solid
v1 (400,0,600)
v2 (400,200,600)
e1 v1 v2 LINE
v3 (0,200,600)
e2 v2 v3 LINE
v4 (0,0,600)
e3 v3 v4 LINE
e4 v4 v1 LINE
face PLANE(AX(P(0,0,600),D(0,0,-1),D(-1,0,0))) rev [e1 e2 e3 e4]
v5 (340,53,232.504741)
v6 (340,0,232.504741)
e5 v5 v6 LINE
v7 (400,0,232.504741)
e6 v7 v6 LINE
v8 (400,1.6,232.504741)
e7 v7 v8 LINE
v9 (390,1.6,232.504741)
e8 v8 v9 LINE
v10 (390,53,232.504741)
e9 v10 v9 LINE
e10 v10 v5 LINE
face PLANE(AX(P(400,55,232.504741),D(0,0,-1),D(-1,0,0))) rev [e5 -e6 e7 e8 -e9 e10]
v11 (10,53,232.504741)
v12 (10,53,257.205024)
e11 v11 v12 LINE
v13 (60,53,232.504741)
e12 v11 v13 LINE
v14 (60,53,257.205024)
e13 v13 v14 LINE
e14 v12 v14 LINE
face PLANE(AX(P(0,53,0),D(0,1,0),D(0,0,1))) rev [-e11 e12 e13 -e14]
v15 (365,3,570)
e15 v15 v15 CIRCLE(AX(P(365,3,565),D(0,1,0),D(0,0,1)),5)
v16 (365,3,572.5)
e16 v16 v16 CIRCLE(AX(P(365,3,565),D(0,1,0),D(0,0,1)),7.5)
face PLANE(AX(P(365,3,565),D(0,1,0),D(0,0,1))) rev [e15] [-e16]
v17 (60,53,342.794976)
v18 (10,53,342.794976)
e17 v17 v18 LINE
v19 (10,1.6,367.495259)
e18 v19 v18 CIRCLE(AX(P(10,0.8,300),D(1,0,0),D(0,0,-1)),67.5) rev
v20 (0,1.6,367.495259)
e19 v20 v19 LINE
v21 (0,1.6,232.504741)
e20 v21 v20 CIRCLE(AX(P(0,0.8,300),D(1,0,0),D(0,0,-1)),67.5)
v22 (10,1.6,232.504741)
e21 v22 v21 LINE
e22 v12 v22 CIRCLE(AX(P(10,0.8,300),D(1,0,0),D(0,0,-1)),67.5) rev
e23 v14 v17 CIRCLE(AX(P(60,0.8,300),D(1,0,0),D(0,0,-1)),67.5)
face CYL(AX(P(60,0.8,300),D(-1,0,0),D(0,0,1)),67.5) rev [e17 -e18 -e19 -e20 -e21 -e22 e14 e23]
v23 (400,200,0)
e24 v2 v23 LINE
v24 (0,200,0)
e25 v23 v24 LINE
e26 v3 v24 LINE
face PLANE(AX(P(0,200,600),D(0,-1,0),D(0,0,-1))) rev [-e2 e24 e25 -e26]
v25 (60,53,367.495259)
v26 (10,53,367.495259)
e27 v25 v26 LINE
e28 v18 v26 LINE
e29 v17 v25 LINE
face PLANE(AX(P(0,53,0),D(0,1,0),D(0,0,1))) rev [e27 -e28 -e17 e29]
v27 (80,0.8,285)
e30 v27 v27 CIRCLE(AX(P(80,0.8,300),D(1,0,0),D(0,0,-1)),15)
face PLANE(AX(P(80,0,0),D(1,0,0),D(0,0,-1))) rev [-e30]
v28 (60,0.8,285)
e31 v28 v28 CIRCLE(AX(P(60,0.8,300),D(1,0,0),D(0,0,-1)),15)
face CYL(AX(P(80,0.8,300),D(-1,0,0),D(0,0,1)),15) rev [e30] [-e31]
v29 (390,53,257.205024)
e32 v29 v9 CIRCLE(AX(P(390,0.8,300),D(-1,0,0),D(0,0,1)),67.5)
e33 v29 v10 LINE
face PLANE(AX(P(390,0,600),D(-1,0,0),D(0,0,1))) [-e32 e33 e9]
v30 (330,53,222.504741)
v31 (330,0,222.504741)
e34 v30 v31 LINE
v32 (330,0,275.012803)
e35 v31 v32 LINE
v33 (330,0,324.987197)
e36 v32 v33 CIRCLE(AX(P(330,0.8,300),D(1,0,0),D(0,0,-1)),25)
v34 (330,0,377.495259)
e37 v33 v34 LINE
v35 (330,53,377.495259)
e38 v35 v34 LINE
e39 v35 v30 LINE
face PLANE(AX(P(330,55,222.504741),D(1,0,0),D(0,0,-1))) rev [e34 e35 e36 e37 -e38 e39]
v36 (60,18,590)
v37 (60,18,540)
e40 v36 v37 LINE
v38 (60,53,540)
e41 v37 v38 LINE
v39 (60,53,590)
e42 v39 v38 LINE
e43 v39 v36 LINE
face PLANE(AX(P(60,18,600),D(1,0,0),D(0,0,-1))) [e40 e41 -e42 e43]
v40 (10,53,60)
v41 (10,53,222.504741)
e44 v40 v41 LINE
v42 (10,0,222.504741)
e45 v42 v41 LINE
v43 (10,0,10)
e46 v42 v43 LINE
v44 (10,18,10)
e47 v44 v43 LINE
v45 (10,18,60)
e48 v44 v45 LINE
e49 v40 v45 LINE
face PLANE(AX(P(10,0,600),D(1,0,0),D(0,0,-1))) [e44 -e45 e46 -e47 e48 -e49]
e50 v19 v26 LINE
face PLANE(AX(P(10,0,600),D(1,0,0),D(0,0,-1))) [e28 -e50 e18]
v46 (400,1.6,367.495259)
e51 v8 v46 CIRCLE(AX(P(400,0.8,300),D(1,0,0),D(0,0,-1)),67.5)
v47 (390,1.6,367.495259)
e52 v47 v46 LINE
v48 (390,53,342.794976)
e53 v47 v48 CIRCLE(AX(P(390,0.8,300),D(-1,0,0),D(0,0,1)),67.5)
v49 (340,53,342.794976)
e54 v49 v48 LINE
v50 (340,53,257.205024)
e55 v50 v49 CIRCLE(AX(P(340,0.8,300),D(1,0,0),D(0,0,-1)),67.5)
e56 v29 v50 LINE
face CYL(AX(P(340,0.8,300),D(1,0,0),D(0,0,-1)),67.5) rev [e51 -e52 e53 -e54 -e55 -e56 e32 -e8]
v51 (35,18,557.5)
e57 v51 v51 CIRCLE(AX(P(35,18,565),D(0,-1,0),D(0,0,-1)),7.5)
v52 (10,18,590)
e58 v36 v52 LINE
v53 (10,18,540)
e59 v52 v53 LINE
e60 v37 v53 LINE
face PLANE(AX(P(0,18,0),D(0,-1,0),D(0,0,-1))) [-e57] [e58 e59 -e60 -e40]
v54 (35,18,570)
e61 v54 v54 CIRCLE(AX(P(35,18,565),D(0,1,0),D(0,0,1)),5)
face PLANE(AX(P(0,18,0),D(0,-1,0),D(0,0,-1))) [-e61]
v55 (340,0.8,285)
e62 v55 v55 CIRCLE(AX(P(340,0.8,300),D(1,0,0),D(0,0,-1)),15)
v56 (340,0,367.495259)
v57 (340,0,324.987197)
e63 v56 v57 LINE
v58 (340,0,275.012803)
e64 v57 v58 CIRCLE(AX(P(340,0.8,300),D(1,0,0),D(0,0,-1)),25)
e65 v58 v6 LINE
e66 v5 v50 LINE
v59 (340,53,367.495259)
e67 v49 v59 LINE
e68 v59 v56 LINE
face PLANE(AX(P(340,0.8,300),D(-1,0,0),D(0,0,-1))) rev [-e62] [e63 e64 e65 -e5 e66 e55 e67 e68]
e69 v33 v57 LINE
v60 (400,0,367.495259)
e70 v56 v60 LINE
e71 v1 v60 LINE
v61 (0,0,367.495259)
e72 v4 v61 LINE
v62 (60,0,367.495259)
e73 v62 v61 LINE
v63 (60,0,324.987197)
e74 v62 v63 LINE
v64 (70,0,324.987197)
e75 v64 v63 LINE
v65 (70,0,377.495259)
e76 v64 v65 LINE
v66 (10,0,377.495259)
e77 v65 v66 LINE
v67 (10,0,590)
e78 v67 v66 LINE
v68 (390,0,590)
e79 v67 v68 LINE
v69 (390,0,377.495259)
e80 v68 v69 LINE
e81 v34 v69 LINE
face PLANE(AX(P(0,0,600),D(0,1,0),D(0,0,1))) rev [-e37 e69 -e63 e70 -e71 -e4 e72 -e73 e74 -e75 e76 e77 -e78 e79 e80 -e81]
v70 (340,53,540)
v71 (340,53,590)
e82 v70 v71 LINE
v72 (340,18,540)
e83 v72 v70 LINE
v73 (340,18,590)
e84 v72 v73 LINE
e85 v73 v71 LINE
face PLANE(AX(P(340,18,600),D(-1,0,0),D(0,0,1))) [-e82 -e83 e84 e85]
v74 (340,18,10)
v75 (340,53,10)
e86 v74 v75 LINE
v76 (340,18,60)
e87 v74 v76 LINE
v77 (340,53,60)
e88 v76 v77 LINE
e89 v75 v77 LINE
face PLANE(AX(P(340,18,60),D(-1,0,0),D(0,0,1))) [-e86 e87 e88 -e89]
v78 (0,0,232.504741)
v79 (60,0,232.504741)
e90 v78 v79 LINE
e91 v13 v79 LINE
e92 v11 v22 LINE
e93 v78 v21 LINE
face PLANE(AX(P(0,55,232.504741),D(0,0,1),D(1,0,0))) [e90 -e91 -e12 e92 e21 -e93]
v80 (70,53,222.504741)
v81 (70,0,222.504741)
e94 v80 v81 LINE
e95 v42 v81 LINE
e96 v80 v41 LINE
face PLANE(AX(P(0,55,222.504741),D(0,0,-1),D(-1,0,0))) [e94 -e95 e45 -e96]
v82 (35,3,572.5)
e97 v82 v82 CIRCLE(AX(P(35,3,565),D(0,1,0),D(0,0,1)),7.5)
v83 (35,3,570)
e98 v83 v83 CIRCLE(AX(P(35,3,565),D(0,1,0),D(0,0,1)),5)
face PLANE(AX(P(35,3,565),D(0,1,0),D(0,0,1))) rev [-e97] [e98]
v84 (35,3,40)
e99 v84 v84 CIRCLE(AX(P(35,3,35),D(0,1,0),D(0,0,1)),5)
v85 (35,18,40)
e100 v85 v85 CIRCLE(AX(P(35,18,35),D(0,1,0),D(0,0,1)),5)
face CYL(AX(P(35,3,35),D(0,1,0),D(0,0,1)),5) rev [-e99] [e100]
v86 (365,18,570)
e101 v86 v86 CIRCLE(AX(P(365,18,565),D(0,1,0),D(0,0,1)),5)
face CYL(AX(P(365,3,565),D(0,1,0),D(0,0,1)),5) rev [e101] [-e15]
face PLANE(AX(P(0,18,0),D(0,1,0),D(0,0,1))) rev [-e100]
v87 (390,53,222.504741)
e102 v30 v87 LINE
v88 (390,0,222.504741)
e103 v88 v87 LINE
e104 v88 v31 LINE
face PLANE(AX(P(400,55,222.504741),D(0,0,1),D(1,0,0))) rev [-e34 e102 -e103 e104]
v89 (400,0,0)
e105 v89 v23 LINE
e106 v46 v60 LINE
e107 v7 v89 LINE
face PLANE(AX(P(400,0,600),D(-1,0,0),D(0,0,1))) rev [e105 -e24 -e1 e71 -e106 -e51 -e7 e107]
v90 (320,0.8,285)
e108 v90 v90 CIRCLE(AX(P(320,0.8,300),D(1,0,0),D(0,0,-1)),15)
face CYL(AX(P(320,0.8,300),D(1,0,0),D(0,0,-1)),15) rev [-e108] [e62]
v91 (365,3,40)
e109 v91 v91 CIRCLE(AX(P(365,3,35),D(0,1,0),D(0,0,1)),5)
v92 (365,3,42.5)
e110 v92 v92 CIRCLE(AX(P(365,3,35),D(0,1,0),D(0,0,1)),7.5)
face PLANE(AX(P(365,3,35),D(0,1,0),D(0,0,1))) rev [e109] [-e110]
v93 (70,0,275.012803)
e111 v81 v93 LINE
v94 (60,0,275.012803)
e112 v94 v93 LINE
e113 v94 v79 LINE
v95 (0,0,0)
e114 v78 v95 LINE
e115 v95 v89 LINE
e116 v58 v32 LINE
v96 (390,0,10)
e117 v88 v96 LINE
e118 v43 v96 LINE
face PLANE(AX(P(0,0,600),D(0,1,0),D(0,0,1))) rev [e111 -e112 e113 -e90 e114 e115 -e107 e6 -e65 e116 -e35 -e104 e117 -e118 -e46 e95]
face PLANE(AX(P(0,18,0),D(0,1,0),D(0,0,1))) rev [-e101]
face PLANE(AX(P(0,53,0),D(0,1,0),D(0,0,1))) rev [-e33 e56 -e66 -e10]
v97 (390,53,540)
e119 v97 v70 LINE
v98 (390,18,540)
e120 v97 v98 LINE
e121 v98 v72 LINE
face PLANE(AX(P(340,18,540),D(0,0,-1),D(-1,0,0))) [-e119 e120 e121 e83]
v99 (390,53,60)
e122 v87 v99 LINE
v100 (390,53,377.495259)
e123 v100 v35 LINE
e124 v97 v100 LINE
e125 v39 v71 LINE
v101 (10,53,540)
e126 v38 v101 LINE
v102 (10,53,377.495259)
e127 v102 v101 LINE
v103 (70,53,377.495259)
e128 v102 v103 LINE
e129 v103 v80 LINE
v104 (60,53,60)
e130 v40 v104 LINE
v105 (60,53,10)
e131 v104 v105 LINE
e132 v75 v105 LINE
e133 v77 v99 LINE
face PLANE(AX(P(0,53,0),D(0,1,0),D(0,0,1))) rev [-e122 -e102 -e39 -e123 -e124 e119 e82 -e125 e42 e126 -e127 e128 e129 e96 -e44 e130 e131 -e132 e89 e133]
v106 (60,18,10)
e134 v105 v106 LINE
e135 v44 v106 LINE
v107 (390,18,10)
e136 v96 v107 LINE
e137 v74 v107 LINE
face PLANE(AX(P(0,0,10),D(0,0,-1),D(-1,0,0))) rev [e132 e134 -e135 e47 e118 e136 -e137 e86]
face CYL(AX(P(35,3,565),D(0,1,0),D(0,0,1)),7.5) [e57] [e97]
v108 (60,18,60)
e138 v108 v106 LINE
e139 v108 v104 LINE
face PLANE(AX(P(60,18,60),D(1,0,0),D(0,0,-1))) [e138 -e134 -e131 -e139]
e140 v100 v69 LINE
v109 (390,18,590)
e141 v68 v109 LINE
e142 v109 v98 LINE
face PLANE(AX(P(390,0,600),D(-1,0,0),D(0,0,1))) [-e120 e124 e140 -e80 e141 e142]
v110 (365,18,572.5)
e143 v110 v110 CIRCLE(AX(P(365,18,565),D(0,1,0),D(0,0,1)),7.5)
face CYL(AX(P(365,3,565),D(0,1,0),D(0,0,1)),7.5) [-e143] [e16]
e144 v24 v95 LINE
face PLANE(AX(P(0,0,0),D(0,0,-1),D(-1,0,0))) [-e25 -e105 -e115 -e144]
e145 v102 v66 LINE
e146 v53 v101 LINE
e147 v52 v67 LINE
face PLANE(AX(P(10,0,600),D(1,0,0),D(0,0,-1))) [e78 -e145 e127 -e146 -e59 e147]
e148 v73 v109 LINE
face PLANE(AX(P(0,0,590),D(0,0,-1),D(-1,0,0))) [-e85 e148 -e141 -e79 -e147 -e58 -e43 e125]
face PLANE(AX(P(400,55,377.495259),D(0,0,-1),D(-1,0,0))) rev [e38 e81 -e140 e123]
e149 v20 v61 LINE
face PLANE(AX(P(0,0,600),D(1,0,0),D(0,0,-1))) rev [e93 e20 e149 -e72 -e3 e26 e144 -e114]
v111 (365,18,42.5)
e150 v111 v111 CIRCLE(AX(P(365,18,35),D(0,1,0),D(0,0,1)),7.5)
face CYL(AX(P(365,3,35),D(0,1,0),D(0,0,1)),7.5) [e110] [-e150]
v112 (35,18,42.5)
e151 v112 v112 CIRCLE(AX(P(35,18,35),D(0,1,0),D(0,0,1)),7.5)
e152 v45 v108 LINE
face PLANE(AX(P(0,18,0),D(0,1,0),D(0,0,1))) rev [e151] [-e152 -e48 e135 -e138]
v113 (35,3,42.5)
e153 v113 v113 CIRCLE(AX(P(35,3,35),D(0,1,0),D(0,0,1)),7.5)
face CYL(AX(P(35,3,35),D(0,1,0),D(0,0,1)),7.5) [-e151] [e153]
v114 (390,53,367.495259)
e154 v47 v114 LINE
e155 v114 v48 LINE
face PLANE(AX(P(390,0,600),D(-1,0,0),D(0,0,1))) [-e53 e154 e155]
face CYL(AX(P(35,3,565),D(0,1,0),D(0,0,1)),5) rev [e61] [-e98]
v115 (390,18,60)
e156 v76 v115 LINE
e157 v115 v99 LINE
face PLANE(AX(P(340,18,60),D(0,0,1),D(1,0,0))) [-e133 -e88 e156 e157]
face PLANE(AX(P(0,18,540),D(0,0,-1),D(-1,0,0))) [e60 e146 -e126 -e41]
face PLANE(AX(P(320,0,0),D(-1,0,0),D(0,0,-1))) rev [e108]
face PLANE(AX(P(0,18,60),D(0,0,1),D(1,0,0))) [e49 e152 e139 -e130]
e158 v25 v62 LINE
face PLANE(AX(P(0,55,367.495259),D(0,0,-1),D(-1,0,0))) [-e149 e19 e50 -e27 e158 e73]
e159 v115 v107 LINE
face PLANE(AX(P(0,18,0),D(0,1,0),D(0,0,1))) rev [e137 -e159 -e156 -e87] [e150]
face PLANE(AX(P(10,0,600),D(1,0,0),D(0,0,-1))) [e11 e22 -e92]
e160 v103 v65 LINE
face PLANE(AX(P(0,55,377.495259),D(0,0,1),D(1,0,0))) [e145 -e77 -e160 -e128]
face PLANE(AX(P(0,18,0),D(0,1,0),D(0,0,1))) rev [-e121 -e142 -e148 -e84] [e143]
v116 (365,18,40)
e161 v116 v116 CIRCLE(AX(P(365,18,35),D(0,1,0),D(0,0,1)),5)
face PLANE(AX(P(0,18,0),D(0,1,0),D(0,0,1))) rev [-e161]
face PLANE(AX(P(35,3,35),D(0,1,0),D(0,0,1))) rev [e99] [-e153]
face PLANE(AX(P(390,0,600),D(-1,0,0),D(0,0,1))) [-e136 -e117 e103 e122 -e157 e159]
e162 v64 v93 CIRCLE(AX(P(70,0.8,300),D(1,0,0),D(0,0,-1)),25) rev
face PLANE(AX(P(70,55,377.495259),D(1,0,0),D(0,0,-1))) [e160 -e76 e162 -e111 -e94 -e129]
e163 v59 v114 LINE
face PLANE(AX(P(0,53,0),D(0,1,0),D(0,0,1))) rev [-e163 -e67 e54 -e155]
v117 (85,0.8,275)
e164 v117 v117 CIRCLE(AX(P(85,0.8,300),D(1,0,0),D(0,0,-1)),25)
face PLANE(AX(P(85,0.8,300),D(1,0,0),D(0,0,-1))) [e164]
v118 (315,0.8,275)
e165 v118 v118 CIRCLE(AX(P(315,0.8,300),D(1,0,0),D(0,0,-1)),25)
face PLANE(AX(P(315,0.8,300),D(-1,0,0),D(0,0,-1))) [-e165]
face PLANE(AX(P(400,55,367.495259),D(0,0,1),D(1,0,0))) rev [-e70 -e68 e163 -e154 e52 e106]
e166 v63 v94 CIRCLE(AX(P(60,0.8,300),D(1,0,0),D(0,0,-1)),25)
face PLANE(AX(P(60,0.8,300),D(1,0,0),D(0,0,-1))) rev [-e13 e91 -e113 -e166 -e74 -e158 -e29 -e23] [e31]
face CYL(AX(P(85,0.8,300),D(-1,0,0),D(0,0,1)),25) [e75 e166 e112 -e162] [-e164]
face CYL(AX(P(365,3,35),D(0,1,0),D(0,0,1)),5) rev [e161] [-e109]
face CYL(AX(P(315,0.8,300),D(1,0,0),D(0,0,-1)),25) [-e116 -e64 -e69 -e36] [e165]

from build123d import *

# Parameters (mm, degrees)
SKETCH1_W                = 400
SKETCH1_H                = 200
BOSS_EXTRUDE1_DEPTH      = 600
SHELL1_T                 = -10
BOSS_EXTRUDE2_DEPTH      = 25
BOSS_EXTRUDE2_DEPTH_BACK = 10
SKETCH2_W                = 60
SKETCH2_H                = 60
SKETCH3_R                = 7.5
SKETCH3_R_2              = 5
BOSS_EXTRUDE3_DEPTH      = 15
LPATTERN1_COUNT          = 2
LPATTERN1_PITCH          = 330
LPATTERN1_COUNT_DIR2     = 2
LPATTERN1_PITCH_DIR2     = 530
SKETCH4_R                = 15
CUT_EXTRUDE1_DEPTH       = 749.331477355
BOSS_EXTRUDE4_START      = 15
SKETCH5_R                = 25
SKETCH5_R_2              = 15
BOSS_EXTRUDE4_DEPTH      = 15
THICKEN1_START           = 375
THICKEN1_OUTLINE_W       = 31
THICKEN1_OUTLINE_H       = 30
THICKEN1_DEPTH           = 0.5
THICKEN2_START           = 24.5
THICKEN2_OUTLINE_W       = 31
THICKEN2_OUTLINE_H       = 30
THICKEN2_DEPTH           = 0.5
BOSS_EXTRUDE6_REACH      = 737.941
SKETCH7_W                = 380
SKETCH7_H                = 580
SKETCH10_R               = 67.5
CUT_EXTRUDE2_DEPTH       = 60
SKETCH11_R               = 25
BOSS_EXTRUDE7_DEPTH      = 25
BOSS_EXTRUDE8_DEPTH      = 55
SKETCH11_4_R             = 15
CUT_EXTRUDE4_DEPTH       = 20


# Read off the part's stored shape, not the designer's step: Thicken1, Thicken2
with BuildPart() as part:
    # Sketch1 → Boss-Extrude1 (new body)
    with BuildSketch(Plane.XY):
        with Locations((200, 100)):
            Rectangle(SKETCH1_W, SKETCH1_H)
    extrude(amount=BOSS_EXTRUDE1_DEPTH)

    # Shell1
    shell1_openings = [part.faces().sort_by_distance(p)[0] for p in [
        (200, 0, 300),
    ]]
    offset(amount=SHELL1_T, openings=shell1_openings, kind=Kind.INTERSECTION)

    # Sketch2 → Boss-Extrude2 (add, two sides: drawn at the far end of the back side and taken through both)
    with BuildSketch(Plane(origin=(0, 28, 0), x_dir=(1, 0, 0), z_dir=(0, 1, 0)).offset(-BOSS_EXTRUDE2_DEPTH_BACK)):
        with Locations((370, -570)):
            Rectangle(SKETCH2_W, SKETCH2_H)
        with Locations((30, -570)):
            Rectangle(SKETCH2_W, SKETCH2_H)
        with Locations((370, -30)):
            Rectangle(SKETCH2_W, SKETCH2_H)
        with Locations((30, -30)):
            Rectangle(SKETCH2_W, SKETCH2_H)
    extrude(amount=BOSS_EXTRUDE2_DEPTH + BOSS_EXTRUDE2_DEPTH_BACK)

    # Sketch3 → Boss-Extrude3 (add)
    with BuildSketch(Plane(origin=(0, 18, 0), x_dir=(1, 0, 0), z_dir=(0, 1, 0))):
        with Locations(Location((35, -565, 0), (0, 0, 270))):
            Circle(SKETCH3_R)
        with Locations(Location((35, -565, 0), (0, 0, 270))):
            Circle(SKETCH3_R_2, mode=Mode.SUBTRACT)
    boss_extrude3 = extrude(amount=-BOSS_EXTRUDE3_DEPTH)

    # LPattern1: Boss-Extrude3 2 × 2
    with Locations(*[(i * LPATTERN1_PITCH, 0, -j * LPATTERN1_PITCH_DIR2) for i in range(LPATTERN1_COUNT) for j in range(LPATTERN1_COUNT_DIR2) if (i, j) != (0, 0)]):
        add(boss_extrude3)

    # Sketch4 → Cut-Extrude1 (cut, through all)
    with BuildSketch(Plane(origin=(0, 0, 0), x_dir=(0, 0, -1), z_dir=(1, 0, 0))):
        with Locations((-300, 0.8)):
            Circle(SKETCH4_R)
    extrude(amount=CUT_EXTRUDE1_DEPTH, mode=Mode.SUBTRACT)

    # Sketch5 → Boss-Extrude4 (add)
    with BuildSketch(Plane.ZY.offset(-390).offset(BOSS_EXTRUDE4_START)):
        with Locations(Location((300, 0.8, 0), (0, 0, 181.833778))):
            Circle(SKETCH5_R)
        with Locations((300, 0.8)):
            Circle(SKETCH5_R_2, mode=Mode.SUBTRACT)
    boss_extrude4 = extrude(amount=-BOSS_EXTRUDE4_DEPTH)

    # Thicken1 outline → Thicken1 (add)
    with BuildSketch(Plane.YZ.offset(THICKEN1_START)):
        with Locations((0.5, 300)):
            Rectangle(THICKEN1_OUTLINE_W, THICKEN1_OUTLINE_H)
    extrude(amount=THICKEN1_DEPTH)

    # Mirror5: Boss-Extrude4 across plane
    add(boss_extrude4.mirror(Plane(origin=(200, 0, 0), x_dir=(0, 0, 1), z_dir=(1, 0, 0))))

    # Thicken2 outline → Thicken2 (add)
    with BuildSketch(Plane.YZ.offset(THICKEN2_START)):
        with Locations((0.5, 300)):
            Rectangle(THICKEN2_OUTLINE_W, THICKEN2_OUTLINE_H)
    extrude(amount=THICKEN2_DEPTH)

    # Sketch7 → Boss-Extrude6 (add, up to next)
    with BuildSketch(Plane(origin=(0, 53, 0), x_dir=(1, 0, 0), z_dir=(0, 1, 0)), mode=Mode.PRIVATE) as boss_extrude6_sk1:
        with Locations((200, -300)):
            Rectangle(SKETCH7_W, SKETCH7_H)
    boss_extrude6_tool1 = extrude(boss_extrude6_sk1.sketch, amount=BOSS_EXTRUDE6_REACH, mode=Mode.PRIVATE) - part.part
    add(boss_extrude6_tool1.solids().sort_by_distance((200, 53, 300))[0])

    # Sketch10 → Cut-Extrude2 (cut)
    with BuildSketch(Plane(origin=(0, 0, 0), x_dir=(0, 0, -1), z_dir=(1, 0, 0))):
        with Locations((-300, 0.8)):
            Circle(SKETCH10_R)
    cut_extrude2 = extrude(amount=CUT_EXTRUDE2_DEPTH, mode=Mode.SUBTRACT)



with BuildPart() as body_2:
    # Sketch11 → Boss-Extrude7 (new body)
    with BuildSketch(Plane(origin=(60, 0, 0), x_dir=(0, 0, -1), z_dir=(1, 0, 0))):
        with Locations(Location((-300, 0.8, 0), (0, 0, 358.166222))):
            Circle(SKETCH11_R)
    boss_extrude7 = extrude(amount=BOSS_EXTRUDE7_DEPTH)


with BuildPart() as part_1:
    add(part.part)

    add(body_2.part)  # Boss-Extrude8 merges body 2
    # Sketch12 → Boss-Extrude8 (add)
    with BuildSketch(Plane.XZ):
        Polygon((0, 367.495259093), (60, 367.495259093), (60, 325), (60, 274.564639087), (60, 232.504740907), (0, 232.504740907), (0, 222.504740907), (70, 222.504740907), (70, 274.564639087), (70, 325), (70, 377.495259093), (0, 377.495259093), align=None)
    boss_extrude8 = extrude(amount=-BOSS_EXTRUDE8_DEPTH)

    # Sketch11<4> → Cut-Extrude4 (cut)
    with BuildSketch(Plane(origin=(60, 0, 0), x_dir=(0, 0, -1), z_dir=(1, 0, 0))):
        with Locations(Location((-300, 0.8, 0), (0, 0, 183.057225428))):
            Circle(SKETCH11_4_R)
    cut_extrude4 = extrude(amount=CUT_EXTRUDE4_DEPTH, mode=Mode.SUBTRACT)

    # Mirror7: Cut-Extrude2 across plane
    add(cut_extrude2.mirror(Plane(origin=(200, 0, 0), x_dir=(0, 0, 1), z_dir=(1, 0, 0))), mode=Mode.SUBTRACT)

    # Mirror10: Boss-Extrude8 across plane
    add(boss_extrude8.mirror(Plane(origin=(200, 0, 0), x_dir=(0, 0, 1), z_dir=(1, 0, 0))))

    # Mirror14: Boss-Extrude7 across plane
    add(boss_extrude7.mirror(Plane(origin=(200, 0, 0), x_dir=(0, 0, 1), z_dir=(1, 0, 0))))

    # Mirror15: Cut-Extrude4 across plane
    add(cut_extrude4.mirror(Plane(origin=(200, 0, 0), x_dir=(0, 0, 1), z_dir=(1, 0, 0))), mode=Mode.SUBTRACT)


solid = part_1.part
